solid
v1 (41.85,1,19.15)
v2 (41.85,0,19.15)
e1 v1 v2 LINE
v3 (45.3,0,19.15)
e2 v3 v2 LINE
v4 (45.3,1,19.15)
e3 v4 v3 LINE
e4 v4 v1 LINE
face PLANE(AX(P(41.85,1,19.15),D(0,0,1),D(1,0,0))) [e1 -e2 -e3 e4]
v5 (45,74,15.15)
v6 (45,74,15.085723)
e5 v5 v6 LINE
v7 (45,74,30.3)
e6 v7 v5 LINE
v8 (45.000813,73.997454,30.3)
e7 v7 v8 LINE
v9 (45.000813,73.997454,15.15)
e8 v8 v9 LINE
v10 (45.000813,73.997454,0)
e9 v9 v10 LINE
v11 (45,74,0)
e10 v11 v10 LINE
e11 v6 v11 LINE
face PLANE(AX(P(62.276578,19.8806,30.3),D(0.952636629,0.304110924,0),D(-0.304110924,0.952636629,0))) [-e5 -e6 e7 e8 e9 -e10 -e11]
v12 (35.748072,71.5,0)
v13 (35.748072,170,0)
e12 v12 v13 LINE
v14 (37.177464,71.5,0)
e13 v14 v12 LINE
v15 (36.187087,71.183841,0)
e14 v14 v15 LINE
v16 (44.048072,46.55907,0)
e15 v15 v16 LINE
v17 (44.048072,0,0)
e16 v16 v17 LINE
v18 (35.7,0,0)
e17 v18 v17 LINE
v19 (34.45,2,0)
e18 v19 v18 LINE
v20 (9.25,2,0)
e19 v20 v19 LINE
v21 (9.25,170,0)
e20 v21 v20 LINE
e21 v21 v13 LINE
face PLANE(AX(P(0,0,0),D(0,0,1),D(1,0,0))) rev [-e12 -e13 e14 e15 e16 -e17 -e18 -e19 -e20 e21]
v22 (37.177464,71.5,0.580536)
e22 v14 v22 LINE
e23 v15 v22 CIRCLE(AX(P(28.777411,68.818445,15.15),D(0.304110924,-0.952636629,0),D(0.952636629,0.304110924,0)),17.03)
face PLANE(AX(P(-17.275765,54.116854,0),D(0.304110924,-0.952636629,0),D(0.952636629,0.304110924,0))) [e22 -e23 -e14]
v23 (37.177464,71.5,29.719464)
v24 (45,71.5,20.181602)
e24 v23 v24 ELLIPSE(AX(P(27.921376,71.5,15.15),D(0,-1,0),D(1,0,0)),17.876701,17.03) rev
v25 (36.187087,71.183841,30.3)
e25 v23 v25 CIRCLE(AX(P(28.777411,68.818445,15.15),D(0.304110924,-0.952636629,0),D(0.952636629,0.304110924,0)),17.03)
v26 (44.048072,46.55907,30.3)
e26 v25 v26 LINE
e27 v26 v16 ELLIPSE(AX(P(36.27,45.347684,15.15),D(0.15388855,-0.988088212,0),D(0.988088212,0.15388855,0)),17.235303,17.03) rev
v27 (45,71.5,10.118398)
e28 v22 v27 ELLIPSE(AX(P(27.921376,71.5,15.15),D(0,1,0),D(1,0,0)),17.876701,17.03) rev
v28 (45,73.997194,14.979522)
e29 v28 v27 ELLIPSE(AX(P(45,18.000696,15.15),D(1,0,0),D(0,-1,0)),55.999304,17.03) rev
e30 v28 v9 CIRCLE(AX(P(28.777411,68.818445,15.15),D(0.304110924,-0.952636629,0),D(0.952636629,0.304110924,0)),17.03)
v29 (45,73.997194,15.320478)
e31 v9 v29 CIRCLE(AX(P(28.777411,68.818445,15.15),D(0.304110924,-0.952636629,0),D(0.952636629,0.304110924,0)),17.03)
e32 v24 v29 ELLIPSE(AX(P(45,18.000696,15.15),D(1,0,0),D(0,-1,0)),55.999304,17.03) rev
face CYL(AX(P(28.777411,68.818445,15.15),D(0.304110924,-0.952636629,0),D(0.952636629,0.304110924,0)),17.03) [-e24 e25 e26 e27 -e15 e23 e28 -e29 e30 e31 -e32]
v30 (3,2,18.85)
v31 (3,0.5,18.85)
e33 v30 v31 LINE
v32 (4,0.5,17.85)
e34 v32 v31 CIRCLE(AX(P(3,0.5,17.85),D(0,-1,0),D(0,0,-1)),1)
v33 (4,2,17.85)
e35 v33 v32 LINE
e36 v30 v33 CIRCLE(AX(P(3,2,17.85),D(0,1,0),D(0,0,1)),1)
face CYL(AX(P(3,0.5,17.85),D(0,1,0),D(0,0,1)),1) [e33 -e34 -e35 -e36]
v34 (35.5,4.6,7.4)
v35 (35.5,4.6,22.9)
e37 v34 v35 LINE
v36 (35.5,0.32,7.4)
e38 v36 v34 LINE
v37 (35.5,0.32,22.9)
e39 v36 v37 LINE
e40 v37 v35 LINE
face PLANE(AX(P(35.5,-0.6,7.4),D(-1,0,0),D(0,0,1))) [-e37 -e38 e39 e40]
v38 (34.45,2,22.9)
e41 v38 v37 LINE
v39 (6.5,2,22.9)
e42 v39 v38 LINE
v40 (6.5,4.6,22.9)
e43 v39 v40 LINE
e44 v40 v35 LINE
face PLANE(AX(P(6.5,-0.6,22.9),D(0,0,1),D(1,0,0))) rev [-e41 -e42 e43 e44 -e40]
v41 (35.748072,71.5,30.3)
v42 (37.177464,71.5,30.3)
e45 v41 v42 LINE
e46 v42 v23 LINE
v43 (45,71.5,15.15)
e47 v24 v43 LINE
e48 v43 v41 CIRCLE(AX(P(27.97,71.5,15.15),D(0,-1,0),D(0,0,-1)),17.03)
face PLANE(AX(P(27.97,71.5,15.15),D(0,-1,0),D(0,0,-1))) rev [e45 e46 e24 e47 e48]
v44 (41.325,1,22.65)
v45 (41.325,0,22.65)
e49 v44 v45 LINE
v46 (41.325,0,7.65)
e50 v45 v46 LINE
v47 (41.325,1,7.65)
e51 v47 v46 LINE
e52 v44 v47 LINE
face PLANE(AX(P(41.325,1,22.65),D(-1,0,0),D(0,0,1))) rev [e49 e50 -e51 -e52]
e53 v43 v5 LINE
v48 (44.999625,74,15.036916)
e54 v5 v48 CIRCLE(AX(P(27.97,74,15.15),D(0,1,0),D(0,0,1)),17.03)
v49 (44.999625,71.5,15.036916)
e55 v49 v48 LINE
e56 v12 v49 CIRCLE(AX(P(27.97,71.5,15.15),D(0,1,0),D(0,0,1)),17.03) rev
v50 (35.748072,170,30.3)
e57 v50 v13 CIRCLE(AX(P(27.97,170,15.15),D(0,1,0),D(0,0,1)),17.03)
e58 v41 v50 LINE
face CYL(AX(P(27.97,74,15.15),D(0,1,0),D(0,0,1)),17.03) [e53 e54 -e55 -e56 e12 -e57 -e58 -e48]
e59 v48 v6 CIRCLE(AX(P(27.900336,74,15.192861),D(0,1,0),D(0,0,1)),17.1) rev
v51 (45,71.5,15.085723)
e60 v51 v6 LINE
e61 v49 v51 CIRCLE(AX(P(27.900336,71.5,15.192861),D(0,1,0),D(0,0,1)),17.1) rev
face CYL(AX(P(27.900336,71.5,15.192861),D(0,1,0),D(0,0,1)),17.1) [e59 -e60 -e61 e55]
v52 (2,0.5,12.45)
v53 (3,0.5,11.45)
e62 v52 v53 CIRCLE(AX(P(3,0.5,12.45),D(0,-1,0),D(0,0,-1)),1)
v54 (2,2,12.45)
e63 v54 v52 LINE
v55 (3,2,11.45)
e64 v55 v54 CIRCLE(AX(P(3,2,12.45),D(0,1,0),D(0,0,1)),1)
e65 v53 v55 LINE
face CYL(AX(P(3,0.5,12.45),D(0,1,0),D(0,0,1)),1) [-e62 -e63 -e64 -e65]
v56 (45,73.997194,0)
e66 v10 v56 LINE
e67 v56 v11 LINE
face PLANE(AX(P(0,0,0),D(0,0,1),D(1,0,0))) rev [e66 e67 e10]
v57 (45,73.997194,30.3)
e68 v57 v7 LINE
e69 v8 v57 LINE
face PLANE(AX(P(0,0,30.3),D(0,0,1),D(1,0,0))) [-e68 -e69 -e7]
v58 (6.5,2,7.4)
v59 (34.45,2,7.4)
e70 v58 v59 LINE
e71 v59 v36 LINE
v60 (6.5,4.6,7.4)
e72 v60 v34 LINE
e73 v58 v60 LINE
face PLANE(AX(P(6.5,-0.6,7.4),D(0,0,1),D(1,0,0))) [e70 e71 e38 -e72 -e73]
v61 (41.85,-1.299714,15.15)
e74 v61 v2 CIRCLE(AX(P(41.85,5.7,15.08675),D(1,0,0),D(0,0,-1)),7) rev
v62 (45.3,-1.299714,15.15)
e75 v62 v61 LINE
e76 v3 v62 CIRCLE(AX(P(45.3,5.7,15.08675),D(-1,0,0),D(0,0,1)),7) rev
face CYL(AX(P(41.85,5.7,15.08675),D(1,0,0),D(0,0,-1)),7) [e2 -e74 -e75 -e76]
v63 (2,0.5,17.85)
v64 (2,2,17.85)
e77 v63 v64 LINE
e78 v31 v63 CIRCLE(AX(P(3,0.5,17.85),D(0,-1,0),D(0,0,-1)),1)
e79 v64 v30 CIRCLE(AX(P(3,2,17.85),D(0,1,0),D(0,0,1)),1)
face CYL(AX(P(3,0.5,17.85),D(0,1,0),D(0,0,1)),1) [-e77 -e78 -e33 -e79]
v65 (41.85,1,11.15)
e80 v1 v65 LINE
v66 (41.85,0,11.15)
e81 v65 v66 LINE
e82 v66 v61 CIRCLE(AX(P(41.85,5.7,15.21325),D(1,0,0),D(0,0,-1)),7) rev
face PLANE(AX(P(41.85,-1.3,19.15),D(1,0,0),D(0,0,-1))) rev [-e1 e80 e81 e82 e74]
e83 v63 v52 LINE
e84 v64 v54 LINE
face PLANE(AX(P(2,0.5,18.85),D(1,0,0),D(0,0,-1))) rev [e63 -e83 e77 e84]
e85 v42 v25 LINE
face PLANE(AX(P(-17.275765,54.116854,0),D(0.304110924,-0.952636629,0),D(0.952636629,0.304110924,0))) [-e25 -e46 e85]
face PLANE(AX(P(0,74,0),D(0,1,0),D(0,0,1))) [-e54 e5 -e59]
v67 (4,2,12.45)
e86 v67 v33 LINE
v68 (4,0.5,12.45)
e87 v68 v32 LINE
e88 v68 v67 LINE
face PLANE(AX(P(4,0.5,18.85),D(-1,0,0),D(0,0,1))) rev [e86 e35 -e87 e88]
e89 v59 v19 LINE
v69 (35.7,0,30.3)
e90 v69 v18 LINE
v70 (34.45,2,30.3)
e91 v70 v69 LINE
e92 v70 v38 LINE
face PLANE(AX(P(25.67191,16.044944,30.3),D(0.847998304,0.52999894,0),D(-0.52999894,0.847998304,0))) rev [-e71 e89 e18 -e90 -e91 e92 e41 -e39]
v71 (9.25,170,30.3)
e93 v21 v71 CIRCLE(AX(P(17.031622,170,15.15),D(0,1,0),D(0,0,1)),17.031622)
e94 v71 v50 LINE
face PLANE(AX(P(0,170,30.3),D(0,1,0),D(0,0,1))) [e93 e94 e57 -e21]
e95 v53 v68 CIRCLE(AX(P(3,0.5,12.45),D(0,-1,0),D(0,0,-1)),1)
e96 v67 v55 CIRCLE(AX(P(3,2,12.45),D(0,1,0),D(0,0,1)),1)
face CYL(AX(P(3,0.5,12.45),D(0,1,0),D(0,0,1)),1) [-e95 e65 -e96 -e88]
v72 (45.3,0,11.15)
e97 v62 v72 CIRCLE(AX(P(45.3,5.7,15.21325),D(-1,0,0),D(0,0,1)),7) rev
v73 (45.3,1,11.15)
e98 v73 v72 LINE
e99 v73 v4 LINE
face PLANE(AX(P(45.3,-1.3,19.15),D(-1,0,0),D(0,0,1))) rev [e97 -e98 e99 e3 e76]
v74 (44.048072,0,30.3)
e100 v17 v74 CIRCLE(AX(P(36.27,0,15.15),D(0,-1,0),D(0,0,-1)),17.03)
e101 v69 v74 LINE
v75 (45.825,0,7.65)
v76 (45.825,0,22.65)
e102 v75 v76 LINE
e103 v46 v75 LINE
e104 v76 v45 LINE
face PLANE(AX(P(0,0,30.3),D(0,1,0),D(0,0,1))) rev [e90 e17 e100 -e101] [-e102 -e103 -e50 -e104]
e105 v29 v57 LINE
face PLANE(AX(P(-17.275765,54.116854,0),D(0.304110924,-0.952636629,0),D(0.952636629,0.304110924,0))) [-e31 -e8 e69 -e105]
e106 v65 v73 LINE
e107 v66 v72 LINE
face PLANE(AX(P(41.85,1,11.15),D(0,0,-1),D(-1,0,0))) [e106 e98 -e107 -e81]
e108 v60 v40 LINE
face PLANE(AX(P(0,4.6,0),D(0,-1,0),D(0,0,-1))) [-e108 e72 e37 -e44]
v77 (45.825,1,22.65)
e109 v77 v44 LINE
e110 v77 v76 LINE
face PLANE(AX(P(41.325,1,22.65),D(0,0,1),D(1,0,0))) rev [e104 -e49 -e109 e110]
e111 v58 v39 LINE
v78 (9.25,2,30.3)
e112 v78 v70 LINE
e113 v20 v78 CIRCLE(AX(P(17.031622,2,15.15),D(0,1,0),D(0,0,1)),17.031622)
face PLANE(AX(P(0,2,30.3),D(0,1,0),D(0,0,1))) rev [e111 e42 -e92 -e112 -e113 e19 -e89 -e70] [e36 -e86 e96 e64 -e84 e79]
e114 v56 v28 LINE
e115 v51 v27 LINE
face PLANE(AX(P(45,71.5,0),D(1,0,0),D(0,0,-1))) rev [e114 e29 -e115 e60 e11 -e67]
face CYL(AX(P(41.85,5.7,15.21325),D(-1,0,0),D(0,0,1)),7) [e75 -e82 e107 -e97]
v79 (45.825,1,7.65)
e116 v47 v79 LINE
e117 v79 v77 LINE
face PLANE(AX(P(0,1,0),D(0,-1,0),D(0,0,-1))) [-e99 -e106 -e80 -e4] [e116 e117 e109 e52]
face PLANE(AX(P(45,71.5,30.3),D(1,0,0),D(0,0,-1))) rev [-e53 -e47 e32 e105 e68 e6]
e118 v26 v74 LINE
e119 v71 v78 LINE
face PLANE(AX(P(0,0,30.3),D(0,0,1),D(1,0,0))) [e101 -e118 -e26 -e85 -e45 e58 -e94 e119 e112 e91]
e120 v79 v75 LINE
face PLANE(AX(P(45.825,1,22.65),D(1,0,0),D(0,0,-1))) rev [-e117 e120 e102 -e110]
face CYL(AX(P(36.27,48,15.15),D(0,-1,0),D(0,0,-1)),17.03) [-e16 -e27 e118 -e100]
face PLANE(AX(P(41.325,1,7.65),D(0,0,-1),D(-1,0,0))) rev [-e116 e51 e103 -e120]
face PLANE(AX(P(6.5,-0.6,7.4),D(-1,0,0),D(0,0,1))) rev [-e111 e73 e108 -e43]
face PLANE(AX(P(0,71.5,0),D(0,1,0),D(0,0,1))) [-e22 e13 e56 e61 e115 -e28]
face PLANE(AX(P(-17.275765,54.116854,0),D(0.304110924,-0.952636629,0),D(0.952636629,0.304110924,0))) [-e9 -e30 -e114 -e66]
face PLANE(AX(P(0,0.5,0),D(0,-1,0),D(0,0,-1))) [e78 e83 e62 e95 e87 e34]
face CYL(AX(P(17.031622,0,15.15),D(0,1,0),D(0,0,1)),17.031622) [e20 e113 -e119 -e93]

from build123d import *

# Parameters (mm, degrees)
BOSS_EXTRUDE1_DEPTH      = 30.3
CUT_EXTRUDE1_DEPTH       = 181.717957049
CUT_EXTRUDE7_DEPTH       = 27.29
CUT_EXTRUDE10_DEPTH      = 96
CUT_EXTRUDE11_DEPTH      = 48
SKETCH9_W                = 2
SKETCH9_H                = 7.4
BOSS_EXTRUDE2_DEPTH      = 1.5
FILLET8_R                = 1
CUT_EXTRUDE15_DEPTH      = 2.6
CUT_EXTRUDE15_DEPTH_BACK = 2.6
SKETCH10_W               = 29
SKETCH10_H               = 15.5
SKETCH11_W               = 3.45
SKETCH11_H               = 8
BOSS_EXTRUDE3_DEPTH      = 1.3
FILLET9_R                = 7
CUT_EXTRUDE18_DEPTH      = 2.5
CUT_EXTRUDE23_START      = -2.5
CUT_EXTRUDE23_DEPTH      = 2.5
SKETCH18_W               = 4.5
SKETCH18_H               = 15
SKETCH18_W_2             = 3.45
SKETCH18_H_2             = 8
CUT_EXTRUDE24_DEPTH      = 1


# Read off the part's stored shape, not the designer's step: Cut-Extrude23
# Some blends are built 0.0001 mm under size
with BuildPart() as part:
    # Sketch1 → Boss-Extrude1 (new body)
    with BuildSketch(Plane.XY):
        Polygon((34.45, 2), (35.7, 0), (53.3, 0), (53.3, 48), (45, 74), (45, 170), (0, 170), (0, 2), align=None)
    extrude(amount=BOSS_EXTRUDE1_DEPTH)

    # Sketch2 → Cut-Extrude1 (cut, through all)
    with BuildSketch(Plane(origin=(0, 170, 0), x_dir=(1, 0, 0), z_dir=(0, 1, 0))):
        with BuildLine():
            Line((0, -30.3), (9.25, -30.3))
            ThreePointArc((9.25, -30.3), (2.495291793, -24.025316905), (0, -15.150000022))
            Line((0, -15.150000022), (0, -30.3))
        make_face()
        with BuildLine():
            ThreePointArc((0, -15.150000022), (2.495291781, -6.274683113), (9.25, 0))
            Line((9.25, 0), (0, 0))
            Line((0, 0), (0, -15.150000022))
        make_face()
    extrude(amount=-CUT_EXTRUDE1_DEPTH, mode=Mode.SUBTRACT)

    # Sketch7 → Cut-Extrude7 (cut)
    with BuildSketch(Plane(origin=(-8.97657775, 28.11940018, 0), x_dir=(0, 0, -1), z_dir=(0.30411092373144827, -0.9526366285563479, 0))):
        with BuildLine():
            Line((-15.15, 65.372856641), (-30.3, 65.372856641))
            Line((-30.3, 65.372856641), (-30.3, 56.120928382))
            ThreePointArc((-30.3, 56.120928382), (-24.02581935, 62.876979624), (-15.15, 65.372856641))
        make_face()
        with BuildLine():
            Line((0, 65.372856641), (-15.15, 65.372856641))
            ThreePointArc((-15.15, 65.372856641), (-6.27418065, 62.876979624), (0, 56.120928382))
            Line((0, 56.120928382), (0, 65.372856641))
        make_face()
    extrude(amount=-CUT_EXTRUDE7_DEPTH, mode=Mode.SUBTRACT)

    # Sketch6 → Cut-Extrude10 (cut)
    with BuildSketch(Plane(origin=(0, 170, 0), x_dir=(1, 0, 0), z_dir=(0, 1, 0))):
        with BuildLine():
            Line((45, -15.15), (45, 0))
            Line((45, 0), (35.74807174, 0))
            ThreePointArc((35.74807174, 0), (42.504122982, -6.27418065), (45, -15.15))
        make_face()
        with BuildLine():
            Line((45, -30.3), (45, -15.15))
            ThreePointArc((45, -15.15), (42.504122982, -24.02581935), (35.74807174, -30.3))
            Line((35.74807174, -30.3), (45, -30.3))
        make_face()
    extrude(amount=-CUT_EXTRUDE10_DEPTH, mode=Mode.SUBTRACT)

    # Sketch4 → Cut-Extrude11 (cut)
    with BuildSketch(Plane.XZ):
        with BuildLine():
            Line((53.3, 15.15), (53.3, 30.3))
            Line((53.3, 30.3), (44.04807174, 30.3))
            ThreePointArc((44.04807174, 30.3), (50.804122982, 24.02581935), (53.3, 15.15))
        make_face()
        with BuildLine():
            Line((53.3, 0), (53.3, 15.15))
            ThreePointArc((53.3, 15.15), (50.804122982, 6.27418065), (44.04807174, 0))
            Line((44.04807174, 0), (53.3, 0))
        make_face()
    extrude(amount=-CUT_EXTRUDE11_DEPTH, mode=Mode.SUBTRACT)

    # Sketch9 → Boss-Extrude2 (add)
    with BuildSketch(Plane.XZ.offset(-2)):
        with Locations((3, 15.15)):
            Rectangle(SKETCH9_W, SKETCH9_H)
    extrude(amount=BOSS_EXTRUDE2_DEPTH)

    # Fillet8
    fillet8_edges = [part.edges().sort_by_distance(p)[0] for p in [
        (4, 1.25, 11.45),
        (2, 1.25, 11.45),
        (4, 1.25, 18.85),
        (2, 1.25, 18.85),
    ]]
    fillet(fillet8_edges, radius=FILLET8_R - 0.0001)  # a hair under: the kernel refuses the full size

    # Sketch10 → Cut-Extrude15 (cut, two sides: drawn at the far end of the back side and taken through both)
    with BuildSketch(Plane.XZ.offset(-2).offset(-CUT_EXTRUDE15_DEPTH_BACK)):
        with Locations((21, 15.15)):
            Rectangle(SKETCH10_W, SKETCH10_H)
    extrude(amount=CUT_EXTRUDE15_DEPTH + CUT_EXTRUDE15_DEPTH_BACK, mode=Mode.SUBTRACT)

    # Sketch11 → Boss-Extrude3 (add)
    with BuildSketch(Plane.XZ):
        with Locations((43.575, 15.15)):
            Rectangle(SKETCH11_W, SKETCH11_H)
    extrude(amount=BOSS_EXTRUDE3_DEPTH)

    # Fillet9
    # the kernel refuses this fillet: 7 mm, written as the material it takes off along each edge
    with BuildSketch(Plane(origin=(55.458124827, -1.3, 11.15), x_dir=(0, 1, 0), z_dir=(-1, 0, 0)), Plane(origin=(31.691875173, -1.3, 19.15), x_dir=(0, 1, 0), z_dir=(1, 0, 0))) as fillet9_piece_1:
        with BuildLine():
            CenterArc((7, -4.063249931), FILLET9_R, 144.516796045, 35.483203955)
            Line((0, -4.063249931), (-0.14, -4.063249931))
            Line((-0.14, -4.063249931), (-0.14, 0))
            Line((-0.14, 0), (0, 0.14))
            ThreePointArc((0, 0.14), (0.65, 0.14), (1.186, 0.081264999))
            Line((1.186, 0.081264999), (1.3, 0))
        make_face()
    extrude(amount=23.766249654, mode=Mode.SUBTRACT)

    # Sketch13 → Cut-Extrude18 (cut)
    with BuildSketch(Plane(origin=(0, 74, 0), x_dir=(1, 0, 0), z_dir=(0, 1, 0))):
        with BuildLine():
            Line((35.74807174, -30.3), (45, -30.3))
            Line((45, -30.3), (45, -15.15))
            ThreePointArc((45, -15.15), (42.504122982, -24.02581935), (35.74807174, -30.3))
        make_face()
    extrude(amount=-CUT_EXTRUDE18_DEPTH, mode=Mode.SUBTRACT)

    # Cut-Extrude23 outline → Cut-Extrude23 (cut)
    with BuildSketch(Plane(origin=(0, 74, 0), x_dir=(1, 0, 0), z_dir=(0, 1, 0)).offset(CUT_EXTRUDE23_START)):
        with BuildLine():
            ThreePointArc((44.999624541, -15.036915931), (44.999829684, -15.061319249), (45, -15.085722835))
            Line((45, -15.085722835), (45, 0))
            Line((45, 0), (35.74807174, 0))
            ThreePointArc((35.74807174, 0), (42.474573722, -6.225973939), (44.999624541, -15.036915931))
        make_face()
    extrude(amount=CUT_EXTRUDE23_DEPTH, mode=Mode.SUBTRACT)

    # Sketch18 → Cut-Extrude24 (cut)
    with BuildSketch(Plane.XZ):
        with Locations((43.575, 15.15)):
            Rectangle(SKETCH18_W, SKETCH18_H)
        with Locations((43.575, 15.15)):
            Rectangle(SKETCH18_W_2, SKETCH18_H_2, mode=Mode.SUBTRACT)
    extrude(amount=-CUT_EXTRUDE24_DEPTH, mode=Mode.SUBTRACT)


solid = part.part
